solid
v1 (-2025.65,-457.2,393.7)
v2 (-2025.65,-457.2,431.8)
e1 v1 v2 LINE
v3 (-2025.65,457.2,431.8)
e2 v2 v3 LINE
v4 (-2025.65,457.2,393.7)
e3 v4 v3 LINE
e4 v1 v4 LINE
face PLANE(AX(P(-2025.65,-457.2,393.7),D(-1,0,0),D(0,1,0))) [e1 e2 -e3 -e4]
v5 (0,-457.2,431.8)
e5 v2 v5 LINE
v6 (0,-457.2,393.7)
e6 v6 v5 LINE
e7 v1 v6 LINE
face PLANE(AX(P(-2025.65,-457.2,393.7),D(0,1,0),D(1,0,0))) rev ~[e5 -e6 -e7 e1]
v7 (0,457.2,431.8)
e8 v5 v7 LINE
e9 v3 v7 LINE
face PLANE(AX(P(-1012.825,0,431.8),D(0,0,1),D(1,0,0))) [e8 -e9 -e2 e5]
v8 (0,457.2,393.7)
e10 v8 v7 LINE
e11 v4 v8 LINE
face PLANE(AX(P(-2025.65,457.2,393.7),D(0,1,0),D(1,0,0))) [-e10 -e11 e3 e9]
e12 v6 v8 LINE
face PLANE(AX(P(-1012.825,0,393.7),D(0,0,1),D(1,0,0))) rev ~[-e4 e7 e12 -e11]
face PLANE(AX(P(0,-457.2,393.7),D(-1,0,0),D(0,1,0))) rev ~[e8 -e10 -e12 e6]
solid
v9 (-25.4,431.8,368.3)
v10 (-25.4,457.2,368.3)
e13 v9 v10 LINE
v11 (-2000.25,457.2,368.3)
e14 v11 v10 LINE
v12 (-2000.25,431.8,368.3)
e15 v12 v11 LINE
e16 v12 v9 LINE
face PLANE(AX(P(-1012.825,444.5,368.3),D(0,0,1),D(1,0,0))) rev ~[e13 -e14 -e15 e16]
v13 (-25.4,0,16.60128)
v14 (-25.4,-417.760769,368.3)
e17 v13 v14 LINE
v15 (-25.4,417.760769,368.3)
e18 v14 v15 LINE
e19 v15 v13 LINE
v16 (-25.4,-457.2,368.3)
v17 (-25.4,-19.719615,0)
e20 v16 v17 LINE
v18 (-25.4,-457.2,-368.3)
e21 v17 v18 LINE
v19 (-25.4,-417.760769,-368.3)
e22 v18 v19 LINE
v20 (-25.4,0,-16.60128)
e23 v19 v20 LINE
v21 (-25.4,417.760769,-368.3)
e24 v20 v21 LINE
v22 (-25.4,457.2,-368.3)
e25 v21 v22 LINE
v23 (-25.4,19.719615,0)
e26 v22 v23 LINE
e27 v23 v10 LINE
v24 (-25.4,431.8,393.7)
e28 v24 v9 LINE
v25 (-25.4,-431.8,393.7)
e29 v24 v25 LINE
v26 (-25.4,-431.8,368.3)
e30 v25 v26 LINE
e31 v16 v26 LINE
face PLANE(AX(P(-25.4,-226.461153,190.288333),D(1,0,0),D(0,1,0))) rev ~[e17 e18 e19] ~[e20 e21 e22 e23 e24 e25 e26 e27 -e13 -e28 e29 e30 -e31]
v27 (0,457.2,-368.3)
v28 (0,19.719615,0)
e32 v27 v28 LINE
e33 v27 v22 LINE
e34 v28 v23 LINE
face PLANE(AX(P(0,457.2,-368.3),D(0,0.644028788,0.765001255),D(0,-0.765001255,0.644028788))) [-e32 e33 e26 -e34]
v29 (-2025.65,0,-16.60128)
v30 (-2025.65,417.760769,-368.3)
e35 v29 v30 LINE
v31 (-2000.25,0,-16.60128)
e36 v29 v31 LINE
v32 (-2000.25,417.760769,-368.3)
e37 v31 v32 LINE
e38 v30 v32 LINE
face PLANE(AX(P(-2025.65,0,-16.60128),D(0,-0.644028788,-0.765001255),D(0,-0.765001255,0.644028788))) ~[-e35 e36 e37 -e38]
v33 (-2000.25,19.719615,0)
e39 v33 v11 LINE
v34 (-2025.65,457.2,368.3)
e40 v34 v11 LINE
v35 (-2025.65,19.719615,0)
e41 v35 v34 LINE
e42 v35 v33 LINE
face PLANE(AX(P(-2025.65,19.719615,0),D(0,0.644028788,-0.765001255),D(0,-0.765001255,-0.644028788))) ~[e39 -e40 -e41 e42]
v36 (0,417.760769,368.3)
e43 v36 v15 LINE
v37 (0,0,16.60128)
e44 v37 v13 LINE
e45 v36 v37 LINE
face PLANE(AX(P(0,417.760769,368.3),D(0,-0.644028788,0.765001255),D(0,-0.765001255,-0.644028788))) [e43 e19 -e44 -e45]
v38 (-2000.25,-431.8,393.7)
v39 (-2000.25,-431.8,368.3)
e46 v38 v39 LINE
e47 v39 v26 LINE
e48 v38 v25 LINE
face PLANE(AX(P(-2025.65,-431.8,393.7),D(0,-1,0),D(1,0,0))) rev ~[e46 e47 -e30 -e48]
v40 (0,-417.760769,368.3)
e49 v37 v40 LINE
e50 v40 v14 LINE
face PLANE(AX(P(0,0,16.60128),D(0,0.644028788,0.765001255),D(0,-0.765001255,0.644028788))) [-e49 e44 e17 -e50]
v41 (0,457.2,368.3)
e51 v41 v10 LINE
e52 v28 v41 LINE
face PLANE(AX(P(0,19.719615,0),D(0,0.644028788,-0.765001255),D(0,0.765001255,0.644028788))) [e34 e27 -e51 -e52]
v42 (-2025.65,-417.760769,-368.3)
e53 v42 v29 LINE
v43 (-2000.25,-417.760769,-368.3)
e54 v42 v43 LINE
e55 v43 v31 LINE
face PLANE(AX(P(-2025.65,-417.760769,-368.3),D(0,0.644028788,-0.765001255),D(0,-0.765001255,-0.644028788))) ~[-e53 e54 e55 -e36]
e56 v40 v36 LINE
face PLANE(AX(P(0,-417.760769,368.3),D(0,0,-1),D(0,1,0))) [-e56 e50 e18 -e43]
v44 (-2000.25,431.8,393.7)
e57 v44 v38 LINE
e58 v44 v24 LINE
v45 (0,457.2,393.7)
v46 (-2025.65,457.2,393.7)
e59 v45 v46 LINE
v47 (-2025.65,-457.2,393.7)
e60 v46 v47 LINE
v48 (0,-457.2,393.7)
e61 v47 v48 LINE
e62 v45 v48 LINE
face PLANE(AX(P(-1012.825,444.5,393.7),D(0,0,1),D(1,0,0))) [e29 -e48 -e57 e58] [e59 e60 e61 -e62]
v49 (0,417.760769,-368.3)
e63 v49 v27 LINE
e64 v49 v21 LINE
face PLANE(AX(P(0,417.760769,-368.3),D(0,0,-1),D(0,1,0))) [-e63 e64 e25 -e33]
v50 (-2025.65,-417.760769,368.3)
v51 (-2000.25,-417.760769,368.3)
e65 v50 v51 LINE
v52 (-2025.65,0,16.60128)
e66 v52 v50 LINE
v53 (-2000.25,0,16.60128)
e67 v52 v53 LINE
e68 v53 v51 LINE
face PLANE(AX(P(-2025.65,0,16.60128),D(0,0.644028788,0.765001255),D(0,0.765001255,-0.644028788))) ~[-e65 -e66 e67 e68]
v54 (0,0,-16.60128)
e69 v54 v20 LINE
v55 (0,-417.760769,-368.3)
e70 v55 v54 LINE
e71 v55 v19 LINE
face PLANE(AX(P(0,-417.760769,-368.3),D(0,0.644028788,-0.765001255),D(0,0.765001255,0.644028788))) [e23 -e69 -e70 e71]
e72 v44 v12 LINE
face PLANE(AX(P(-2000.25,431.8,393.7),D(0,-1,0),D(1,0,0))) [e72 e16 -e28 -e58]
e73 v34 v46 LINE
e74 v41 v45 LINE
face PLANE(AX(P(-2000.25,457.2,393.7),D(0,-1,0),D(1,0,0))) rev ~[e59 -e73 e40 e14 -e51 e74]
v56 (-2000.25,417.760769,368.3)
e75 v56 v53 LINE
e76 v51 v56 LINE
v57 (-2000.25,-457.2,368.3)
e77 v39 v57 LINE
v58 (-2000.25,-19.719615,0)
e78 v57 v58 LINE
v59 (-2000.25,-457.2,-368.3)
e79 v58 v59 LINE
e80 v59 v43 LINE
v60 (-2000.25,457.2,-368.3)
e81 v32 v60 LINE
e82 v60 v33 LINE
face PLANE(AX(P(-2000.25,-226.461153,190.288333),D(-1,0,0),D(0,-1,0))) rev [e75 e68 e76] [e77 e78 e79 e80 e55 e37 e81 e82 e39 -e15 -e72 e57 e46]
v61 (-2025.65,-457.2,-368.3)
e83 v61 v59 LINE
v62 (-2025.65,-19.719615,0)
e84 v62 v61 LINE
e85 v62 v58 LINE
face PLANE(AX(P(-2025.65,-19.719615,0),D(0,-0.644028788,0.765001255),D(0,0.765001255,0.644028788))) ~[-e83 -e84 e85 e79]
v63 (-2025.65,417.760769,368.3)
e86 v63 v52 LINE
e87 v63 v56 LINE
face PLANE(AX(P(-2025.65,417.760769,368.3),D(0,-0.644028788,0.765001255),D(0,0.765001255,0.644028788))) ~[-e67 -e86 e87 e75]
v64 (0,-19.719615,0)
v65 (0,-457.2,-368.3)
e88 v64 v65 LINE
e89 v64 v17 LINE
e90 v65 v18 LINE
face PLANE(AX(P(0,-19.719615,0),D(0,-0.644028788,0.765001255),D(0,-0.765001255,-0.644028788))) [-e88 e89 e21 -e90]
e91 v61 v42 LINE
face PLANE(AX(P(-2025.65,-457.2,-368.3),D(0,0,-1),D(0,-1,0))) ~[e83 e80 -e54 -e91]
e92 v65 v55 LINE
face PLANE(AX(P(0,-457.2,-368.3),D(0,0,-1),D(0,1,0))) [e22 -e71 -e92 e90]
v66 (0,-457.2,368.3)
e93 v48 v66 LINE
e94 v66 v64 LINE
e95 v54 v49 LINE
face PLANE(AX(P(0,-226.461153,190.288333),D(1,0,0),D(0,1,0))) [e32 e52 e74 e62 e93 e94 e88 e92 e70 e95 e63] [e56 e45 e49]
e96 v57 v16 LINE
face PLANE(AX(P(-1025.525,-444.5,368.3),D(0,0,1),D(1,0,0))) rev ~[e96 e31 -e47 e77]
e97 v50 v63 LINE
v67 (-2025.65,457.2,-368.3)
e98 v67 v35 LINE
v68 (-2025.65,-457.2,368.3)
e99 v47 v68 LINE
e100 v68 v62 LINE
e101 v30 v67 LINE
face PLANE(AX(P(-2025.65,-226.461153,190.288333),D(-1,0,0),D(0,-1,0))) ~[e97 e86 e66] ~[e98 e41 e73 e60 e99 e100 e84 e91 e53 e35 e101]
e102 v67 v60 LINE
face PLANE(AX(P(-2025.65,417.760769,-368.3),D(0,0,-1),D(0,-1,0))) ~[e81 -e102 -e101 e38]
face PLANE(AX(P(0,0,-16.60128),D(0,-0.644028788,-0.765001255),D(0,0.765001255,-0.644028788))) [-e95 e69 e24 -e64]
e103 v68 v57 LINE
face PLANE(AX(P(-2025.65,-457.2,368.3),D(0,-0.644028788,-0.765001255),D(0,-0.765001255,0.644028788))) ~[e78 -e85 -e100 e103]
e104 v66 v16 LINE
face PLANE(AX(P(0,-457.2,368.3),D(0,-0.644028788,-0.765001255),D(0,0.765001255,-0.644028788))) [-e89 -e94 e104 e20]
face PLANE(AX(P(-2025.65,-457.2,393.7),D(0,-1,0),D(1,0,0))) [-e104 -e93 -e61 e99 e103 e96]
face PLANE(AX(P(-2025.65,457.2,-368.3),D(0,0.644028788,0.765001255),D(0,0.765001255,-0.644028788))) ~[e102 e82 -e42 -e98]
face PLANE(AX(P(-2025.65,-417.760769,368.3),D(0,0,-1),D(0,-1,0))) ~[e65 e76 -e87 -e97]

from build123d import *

# Parameters (mm, degrees)
F1_DEPTH = 25.4
F5_W     = 2025.65
F5_H     = 914.4
F6_DEPTH = 38.1
F7_W     = 1974.85
F7_H     = 25.4
F7_W_2   = 2000.25
F8_DEPTH = 25.4


# Not quite as in the source:
# - a feature of the source that left no trace in its solid (it failed there, or was rolled back) is left out
# - a pattern or mirror of a feature is missing from the dataset's text; its kind, count and spacing are read off the source's solid


with BuildPart() as f1:
    # F0 (on Right) → F1 (new body)
    with BuildSketch(Plane.YZ):
        Polygon((-417.7607692471, 368.3), (-457.2, 368.3), (-19.7196153764, 0), (0, 16.6012799623), align=None)
        Polygon((-457.2, 393.7), (-457.2, 368.3), (-417.7607692471, 368.3), (417.7607692471, 368.3), (457.2, 368.3), (457.2, 393.7), align=None)
        Polygon((0, 16.6012799623), (-19.7196153764, 0), (0, -16.6012799623), (19.7196153764, 0), align=None)
        Polygon((0, -16.6012799623), (-19.7196153764, 0), (-457.2, -368.3), (-417.7607692471, -368.3), align=None)
        Polygon((19.7196153764, 0), (0, -16.6012799623), (417.7607692471, -368.3), (457.2, -368.3), align=None)
        Polygon((417.7607692471, 368.3), (0, 16.6012799623), (19.7196153764, 0), (457.2, 368.3), align=None)
    extrude(amount=-F1_DEPTH)


with BuildPart() as f1_copies_1:
    # F1_copies: instance of F1
    add(f1.part.mirror(Plane(origin=(-1012.825, 0, 0), x_dir=(0, 0, -1), z_dir=(-1, 0, 0))))


with BuildPart() as f6:
    # F5 (on face) → F6 (new body)
    with BuildSketch(Plane.XY.offset(393.7)):
        with Locations((-1012.825, 0)):
            Rectangle(F5_W, F5_H)
    extrude(amount=F6_DEPTH)


with BuildPart() as f1_1:
    add(f1.part)

    add(f1_copies_1.part)  # F8 merges F1_copies_1
    # F7 (on face) → F8 (join)
    with BuildSketch(Plane.XY.offset(393.7)):
        with Locations((-1012.825, 444.5)):
            Rectangle(F7_W, F7_H)
        with Locations((-1025.525, -444.5)):
            Rectangle(F7_W_2, F7_H)
    extrude(amount=-F8_DEPTH)


solid = Compound([f6.part, f1_1.part])
